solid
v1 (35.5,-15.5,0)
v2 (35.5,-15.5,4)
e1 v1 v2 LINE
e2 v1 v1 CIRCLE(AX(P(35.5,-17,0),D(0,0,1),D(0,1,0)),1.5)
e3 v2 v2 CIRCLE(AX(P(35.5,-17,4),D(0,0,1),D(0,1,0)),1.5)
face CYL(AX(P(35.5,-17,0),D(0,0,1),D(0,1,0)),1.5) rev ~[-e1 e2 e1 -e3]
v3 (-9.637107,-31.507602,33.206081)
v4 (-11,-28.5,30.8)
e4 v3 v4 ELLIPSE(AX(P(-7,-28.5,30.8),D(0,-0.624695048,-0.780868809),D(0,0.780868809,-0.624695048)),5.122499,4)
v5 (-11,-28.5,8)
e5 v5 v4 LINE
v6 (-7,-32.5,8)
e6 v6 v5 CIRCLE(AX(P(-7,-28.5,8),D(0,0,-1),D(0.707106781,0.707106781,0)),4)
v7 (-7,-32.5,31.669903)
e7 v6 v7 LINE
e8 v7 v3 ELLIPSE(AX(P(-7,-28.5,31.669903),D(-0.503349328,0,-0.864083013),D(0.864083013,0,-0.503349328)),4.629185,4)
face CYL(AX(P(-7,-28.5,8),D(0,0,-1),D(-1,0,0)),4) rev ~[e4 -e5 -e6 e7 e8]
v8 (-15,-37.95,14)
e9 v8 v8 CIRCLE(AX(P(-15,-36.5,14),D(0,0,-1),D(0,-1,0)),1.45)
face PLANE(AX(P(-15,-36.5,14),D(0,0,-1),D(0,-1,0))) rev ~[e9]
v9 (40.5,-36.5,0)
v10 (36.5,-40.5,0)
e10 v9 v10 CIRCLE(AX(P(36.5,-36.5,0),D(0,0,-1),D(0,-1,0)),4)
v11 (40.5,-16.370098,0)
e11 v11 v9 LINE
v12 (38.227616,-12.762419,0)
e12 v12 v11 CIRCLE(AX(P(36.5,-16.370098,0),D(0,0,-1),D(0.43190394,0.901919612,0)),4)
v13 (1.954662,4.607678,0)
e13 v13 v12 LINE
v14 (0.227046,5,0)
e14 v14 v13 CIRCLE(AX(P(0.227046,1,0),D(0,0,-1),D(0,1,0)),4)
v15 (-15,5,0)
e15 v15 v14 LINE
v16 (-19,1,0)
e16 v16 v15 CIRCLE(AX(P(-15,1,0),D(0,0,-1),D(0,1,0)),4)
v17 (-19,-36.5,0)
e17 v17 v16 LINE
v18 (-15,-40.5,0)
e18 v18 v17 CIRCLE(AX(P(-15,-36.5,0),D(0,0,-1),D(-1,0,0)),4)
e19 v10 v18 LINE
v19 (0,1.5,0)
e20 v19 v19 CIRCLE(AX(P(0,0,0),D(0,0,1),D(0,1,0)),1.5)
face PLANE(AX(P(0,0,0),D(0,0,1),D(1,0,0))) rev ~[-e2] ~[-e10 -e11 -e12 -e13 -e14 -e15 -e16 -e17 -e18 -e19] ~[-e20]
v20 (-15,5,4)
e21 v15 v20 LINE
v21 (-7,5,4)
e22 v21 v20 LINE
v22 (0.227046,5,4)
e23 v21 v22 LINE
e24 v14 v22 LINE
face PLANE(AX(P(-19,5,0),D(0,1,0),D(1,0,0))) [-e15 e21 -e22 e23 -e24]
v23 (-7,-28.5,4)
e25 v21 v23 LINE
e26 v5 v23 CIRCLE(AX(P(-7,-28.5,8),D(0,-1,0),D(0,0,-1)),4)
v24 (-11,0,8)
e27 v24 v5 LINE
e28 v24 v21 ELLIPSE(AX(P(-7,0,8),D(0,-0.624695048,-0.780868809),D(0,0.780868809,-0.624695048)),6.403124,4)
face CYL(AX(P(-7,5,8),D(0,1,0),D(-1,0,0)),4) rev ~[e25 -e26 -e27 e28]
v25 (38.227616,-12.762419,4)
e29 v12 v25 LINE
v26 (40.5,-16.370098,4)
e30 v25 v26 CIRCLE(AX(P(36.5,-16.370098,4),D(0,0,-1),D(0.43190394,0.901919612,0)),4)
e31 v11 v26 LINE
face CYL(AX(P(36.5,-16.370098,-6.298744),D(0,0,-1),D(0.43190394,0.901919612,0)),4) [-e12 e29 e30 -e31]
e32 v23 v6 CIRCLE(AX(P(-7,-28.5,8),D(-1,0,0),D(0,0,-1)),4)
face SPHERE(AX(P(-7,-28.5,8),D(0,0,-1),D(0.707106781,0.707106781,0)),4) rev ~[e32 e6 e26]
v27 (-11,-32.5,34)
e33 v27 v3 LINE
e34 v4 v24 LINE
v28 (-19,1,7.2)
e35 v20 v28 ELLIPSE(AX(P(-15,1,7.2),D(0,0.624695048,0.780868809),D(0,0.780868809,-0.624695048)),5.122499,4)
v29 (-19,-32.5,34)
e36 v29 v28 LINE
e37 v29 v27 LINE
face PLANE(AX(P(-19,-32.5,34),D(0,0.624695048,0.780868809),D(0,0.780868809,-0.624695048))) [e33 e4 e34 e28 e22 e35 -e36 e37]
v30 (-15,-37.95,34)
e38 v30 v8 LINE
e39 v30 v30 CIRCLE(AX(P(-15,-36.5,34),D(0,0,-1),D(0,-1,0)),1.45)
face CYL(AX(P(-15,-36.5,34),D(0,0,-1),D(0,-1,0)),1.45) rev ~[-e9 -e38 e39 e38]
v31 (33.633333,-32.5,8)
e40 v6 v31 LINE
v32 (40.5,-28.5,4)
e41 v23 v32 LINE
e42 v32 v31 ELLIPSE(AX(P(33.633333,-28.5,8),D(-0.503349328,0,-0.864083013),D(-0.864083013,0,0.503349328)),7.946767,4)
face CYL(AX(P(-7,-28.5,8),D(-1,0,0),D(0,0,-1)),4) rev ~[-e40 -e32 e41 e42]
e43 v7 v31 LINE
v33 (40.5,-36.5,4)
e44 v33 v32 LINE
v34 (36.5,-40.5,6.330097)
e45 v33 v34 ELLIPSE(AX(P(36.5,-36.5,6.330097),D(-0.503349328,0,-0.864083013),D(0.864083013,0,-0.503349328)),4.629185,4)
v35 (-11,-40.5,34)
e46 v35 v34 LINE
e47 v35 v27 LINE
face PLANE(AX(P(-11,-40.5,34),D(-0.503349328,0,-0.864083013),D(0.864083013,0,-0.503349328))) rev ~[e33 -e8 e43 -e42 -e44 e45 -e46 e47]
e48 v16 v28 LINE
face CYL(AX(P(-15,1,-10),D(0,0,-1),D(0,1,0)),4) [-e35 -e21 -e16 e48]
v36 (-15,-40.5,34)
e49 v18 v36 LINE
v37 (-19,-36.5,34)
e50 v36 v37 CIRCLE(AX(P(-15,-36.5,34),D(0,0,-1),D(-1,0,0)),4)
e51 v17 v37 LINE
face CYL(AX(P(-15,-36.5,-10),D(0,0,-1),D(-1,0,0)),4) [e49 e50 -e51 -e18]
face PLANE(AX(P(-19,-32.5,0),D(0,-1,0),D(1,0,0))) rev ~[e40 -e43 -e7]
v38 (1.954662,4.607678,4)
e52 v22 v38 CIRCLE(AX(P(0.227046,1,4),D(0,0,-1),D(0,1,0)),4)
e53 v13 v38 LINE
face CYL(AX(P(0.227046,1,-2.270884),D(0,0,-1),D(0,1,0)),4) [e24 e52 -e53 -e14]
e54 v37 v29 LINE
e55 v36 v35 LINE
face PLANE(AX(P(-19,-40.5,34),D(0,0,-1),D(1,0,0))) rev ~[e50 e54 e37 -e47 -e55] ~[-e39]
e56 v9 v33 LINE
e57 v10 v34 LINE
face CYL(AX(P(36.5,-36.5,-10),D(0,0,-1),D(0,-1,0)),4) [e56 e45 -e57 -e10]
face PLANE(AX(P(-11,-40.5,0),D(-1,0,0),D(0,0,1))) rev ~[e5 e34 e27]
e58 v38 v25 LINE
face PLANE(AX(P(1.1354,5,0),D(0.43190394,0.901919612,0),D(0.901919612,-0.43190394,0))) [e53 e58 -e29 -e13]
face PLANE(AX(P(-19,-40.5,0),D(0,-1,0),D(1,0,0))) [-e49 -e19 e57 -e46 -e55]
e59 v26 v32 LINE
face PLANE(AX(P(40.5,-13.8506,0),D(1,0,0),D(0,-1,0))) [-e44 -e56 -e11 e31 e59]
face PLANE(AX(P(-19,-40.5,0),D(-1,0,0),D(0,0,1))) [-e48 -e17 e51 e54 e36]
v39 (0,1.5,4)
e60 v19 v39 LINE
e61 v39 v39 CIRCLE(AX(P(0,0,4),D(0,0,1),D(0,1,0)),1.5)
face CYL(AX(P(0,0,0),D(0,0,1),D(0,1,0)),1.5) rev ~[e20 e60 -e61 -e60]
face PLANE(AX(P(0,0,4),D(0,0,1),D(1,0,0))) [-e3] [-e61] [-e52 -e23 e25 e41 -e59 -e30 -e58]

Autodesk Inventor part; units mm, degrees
ref_plane "YZ Plane" through (0, 0, 0) normal (1, 0, 0) x (0, 1, 0)
ref_plane "XZ Plane" through (0, 0, 0) normal (0, 1, 0) x (-1, 0, 0)
ref_plane "XY Plane" through (0, 0, 0) normal (0, 0, 1) x (1, 0, 0)
sketch "Sketch1" plane through (0, 0, 0) normal (0, 0, 1) x (1, 0, 0)
  line L0 (-19, 5) -> (40.5, 5)
  line L1 (40.5, 5) -> (40.5, -40.5)
  line L2 (40.5, -40.5) -> (-19, -40.5)
  line L3 (-19, -40.5) -> (-19, 5)
  line L4 (1.1354, 5) -> (40.5, -13.8506)
  line L5 (35.5, -17) -> (0, 0) construction
  point P0 (-15, -36.5)
  dimension "d0" = 35.5
  dimension "d1" = 17
  dimension "d2" = 50.5
  dimension "d3" = 19.5
  dimension "d4" = 5
  dimension "d5" = 5
  dimension "d6" = 4
  dimension "d7" = 4
  dimension "d31" = 5
extrude "Extrusion1" add sketch "Sketch1" along normal blind 4 contours L0 L4 L1 L2 L3
hole "Hole1" at (35.5, -17, 0) at (0, 0, 0) direction (0, 0, 1) diameter 3 depth 20
sketch "Sketch2" plane through (-19, -40.5, 0) normal (0, -1, 0) x (1, 0, 0)
  line L0 (0, 0) -> (59.5, 0) projected
  line L1 (59.5, 0) -> (59.5, 4) projected
  line L2 (0, 4) -> (59.5, 4) projected
  line L3 (0, 0) -> (0, 4) projected
  line L4 (0, 4) -> (0, 34)
  line L5 (0, 34) -> (8, 34)
  line L6 (8, 34) -> (59.5, 4)
  point P0 (19, 0)
  dimension "d17" = 34
  dimension "d18" = 8
extrude "Extrusion2" add sketch "Sketch2" against normal blind 8 contours L4 L5 L6 L2
sketch "Sketch3" plane through (-19, -40.5, 0) normal (-1, 0, 0) x (0, 0, 1)
  line L0 (0, 45.5) -> (0, 0) projected
  line L1 (0, 0) -> (34, 0) projected
  line L2 (34, 0) -> (34, 8) projected
  line L3 (4, 8) -> (34, 8) projected
  line L4 (4, 45.5) -> (4, 8) projected
  line L5 (0, 45.5) -> (4, 45.5) projected
  line L6 (34, 8) -> (4, 45.5)
  point P0 (0, 40.5)
extrude "Extrusion3" add sketch "Sketch3" against normal blind 8 contours L6 L3 L4
fillet "Fillet1" radius 4 8 edges at (-11, -13.75, 4) (14.75, -32.5, 4) (-11, -32.5, 19) (40.5, -40.5, 2) (-19, 5, 2) (1.1354, 5, 2) (40.5, -13.8506, 2) (-19, -40.5, 17)
sketch "Sketch4" plane through (-19, -40.5, 34) normal (0, 0, 1) x (1, 0, 0)
  line L0 (8, 0) -> (4, 0) projected
  line L1 (8, 0) -> (8, 8) projected
  line L2 (0, 8) -> (8, 8) projected
  line L3 (0, 4) -> (0, 8) projected
  arc A0 (0, 4) -> (4, 0) centre (4, 4) ccw projected
  point P0 (19, 40.5)
  point P1 (4, 4)
hole "Hole2" at (-15, -36.5, 34) direction (0, 0, -1) diameter 2.9 depth 20
equation "\"d5\" = d4"
equation "\"d6\" = d7"
equation "\"d23\" = d7"
properties part number "FrontLevelBlock" material "ABS Plastic"
